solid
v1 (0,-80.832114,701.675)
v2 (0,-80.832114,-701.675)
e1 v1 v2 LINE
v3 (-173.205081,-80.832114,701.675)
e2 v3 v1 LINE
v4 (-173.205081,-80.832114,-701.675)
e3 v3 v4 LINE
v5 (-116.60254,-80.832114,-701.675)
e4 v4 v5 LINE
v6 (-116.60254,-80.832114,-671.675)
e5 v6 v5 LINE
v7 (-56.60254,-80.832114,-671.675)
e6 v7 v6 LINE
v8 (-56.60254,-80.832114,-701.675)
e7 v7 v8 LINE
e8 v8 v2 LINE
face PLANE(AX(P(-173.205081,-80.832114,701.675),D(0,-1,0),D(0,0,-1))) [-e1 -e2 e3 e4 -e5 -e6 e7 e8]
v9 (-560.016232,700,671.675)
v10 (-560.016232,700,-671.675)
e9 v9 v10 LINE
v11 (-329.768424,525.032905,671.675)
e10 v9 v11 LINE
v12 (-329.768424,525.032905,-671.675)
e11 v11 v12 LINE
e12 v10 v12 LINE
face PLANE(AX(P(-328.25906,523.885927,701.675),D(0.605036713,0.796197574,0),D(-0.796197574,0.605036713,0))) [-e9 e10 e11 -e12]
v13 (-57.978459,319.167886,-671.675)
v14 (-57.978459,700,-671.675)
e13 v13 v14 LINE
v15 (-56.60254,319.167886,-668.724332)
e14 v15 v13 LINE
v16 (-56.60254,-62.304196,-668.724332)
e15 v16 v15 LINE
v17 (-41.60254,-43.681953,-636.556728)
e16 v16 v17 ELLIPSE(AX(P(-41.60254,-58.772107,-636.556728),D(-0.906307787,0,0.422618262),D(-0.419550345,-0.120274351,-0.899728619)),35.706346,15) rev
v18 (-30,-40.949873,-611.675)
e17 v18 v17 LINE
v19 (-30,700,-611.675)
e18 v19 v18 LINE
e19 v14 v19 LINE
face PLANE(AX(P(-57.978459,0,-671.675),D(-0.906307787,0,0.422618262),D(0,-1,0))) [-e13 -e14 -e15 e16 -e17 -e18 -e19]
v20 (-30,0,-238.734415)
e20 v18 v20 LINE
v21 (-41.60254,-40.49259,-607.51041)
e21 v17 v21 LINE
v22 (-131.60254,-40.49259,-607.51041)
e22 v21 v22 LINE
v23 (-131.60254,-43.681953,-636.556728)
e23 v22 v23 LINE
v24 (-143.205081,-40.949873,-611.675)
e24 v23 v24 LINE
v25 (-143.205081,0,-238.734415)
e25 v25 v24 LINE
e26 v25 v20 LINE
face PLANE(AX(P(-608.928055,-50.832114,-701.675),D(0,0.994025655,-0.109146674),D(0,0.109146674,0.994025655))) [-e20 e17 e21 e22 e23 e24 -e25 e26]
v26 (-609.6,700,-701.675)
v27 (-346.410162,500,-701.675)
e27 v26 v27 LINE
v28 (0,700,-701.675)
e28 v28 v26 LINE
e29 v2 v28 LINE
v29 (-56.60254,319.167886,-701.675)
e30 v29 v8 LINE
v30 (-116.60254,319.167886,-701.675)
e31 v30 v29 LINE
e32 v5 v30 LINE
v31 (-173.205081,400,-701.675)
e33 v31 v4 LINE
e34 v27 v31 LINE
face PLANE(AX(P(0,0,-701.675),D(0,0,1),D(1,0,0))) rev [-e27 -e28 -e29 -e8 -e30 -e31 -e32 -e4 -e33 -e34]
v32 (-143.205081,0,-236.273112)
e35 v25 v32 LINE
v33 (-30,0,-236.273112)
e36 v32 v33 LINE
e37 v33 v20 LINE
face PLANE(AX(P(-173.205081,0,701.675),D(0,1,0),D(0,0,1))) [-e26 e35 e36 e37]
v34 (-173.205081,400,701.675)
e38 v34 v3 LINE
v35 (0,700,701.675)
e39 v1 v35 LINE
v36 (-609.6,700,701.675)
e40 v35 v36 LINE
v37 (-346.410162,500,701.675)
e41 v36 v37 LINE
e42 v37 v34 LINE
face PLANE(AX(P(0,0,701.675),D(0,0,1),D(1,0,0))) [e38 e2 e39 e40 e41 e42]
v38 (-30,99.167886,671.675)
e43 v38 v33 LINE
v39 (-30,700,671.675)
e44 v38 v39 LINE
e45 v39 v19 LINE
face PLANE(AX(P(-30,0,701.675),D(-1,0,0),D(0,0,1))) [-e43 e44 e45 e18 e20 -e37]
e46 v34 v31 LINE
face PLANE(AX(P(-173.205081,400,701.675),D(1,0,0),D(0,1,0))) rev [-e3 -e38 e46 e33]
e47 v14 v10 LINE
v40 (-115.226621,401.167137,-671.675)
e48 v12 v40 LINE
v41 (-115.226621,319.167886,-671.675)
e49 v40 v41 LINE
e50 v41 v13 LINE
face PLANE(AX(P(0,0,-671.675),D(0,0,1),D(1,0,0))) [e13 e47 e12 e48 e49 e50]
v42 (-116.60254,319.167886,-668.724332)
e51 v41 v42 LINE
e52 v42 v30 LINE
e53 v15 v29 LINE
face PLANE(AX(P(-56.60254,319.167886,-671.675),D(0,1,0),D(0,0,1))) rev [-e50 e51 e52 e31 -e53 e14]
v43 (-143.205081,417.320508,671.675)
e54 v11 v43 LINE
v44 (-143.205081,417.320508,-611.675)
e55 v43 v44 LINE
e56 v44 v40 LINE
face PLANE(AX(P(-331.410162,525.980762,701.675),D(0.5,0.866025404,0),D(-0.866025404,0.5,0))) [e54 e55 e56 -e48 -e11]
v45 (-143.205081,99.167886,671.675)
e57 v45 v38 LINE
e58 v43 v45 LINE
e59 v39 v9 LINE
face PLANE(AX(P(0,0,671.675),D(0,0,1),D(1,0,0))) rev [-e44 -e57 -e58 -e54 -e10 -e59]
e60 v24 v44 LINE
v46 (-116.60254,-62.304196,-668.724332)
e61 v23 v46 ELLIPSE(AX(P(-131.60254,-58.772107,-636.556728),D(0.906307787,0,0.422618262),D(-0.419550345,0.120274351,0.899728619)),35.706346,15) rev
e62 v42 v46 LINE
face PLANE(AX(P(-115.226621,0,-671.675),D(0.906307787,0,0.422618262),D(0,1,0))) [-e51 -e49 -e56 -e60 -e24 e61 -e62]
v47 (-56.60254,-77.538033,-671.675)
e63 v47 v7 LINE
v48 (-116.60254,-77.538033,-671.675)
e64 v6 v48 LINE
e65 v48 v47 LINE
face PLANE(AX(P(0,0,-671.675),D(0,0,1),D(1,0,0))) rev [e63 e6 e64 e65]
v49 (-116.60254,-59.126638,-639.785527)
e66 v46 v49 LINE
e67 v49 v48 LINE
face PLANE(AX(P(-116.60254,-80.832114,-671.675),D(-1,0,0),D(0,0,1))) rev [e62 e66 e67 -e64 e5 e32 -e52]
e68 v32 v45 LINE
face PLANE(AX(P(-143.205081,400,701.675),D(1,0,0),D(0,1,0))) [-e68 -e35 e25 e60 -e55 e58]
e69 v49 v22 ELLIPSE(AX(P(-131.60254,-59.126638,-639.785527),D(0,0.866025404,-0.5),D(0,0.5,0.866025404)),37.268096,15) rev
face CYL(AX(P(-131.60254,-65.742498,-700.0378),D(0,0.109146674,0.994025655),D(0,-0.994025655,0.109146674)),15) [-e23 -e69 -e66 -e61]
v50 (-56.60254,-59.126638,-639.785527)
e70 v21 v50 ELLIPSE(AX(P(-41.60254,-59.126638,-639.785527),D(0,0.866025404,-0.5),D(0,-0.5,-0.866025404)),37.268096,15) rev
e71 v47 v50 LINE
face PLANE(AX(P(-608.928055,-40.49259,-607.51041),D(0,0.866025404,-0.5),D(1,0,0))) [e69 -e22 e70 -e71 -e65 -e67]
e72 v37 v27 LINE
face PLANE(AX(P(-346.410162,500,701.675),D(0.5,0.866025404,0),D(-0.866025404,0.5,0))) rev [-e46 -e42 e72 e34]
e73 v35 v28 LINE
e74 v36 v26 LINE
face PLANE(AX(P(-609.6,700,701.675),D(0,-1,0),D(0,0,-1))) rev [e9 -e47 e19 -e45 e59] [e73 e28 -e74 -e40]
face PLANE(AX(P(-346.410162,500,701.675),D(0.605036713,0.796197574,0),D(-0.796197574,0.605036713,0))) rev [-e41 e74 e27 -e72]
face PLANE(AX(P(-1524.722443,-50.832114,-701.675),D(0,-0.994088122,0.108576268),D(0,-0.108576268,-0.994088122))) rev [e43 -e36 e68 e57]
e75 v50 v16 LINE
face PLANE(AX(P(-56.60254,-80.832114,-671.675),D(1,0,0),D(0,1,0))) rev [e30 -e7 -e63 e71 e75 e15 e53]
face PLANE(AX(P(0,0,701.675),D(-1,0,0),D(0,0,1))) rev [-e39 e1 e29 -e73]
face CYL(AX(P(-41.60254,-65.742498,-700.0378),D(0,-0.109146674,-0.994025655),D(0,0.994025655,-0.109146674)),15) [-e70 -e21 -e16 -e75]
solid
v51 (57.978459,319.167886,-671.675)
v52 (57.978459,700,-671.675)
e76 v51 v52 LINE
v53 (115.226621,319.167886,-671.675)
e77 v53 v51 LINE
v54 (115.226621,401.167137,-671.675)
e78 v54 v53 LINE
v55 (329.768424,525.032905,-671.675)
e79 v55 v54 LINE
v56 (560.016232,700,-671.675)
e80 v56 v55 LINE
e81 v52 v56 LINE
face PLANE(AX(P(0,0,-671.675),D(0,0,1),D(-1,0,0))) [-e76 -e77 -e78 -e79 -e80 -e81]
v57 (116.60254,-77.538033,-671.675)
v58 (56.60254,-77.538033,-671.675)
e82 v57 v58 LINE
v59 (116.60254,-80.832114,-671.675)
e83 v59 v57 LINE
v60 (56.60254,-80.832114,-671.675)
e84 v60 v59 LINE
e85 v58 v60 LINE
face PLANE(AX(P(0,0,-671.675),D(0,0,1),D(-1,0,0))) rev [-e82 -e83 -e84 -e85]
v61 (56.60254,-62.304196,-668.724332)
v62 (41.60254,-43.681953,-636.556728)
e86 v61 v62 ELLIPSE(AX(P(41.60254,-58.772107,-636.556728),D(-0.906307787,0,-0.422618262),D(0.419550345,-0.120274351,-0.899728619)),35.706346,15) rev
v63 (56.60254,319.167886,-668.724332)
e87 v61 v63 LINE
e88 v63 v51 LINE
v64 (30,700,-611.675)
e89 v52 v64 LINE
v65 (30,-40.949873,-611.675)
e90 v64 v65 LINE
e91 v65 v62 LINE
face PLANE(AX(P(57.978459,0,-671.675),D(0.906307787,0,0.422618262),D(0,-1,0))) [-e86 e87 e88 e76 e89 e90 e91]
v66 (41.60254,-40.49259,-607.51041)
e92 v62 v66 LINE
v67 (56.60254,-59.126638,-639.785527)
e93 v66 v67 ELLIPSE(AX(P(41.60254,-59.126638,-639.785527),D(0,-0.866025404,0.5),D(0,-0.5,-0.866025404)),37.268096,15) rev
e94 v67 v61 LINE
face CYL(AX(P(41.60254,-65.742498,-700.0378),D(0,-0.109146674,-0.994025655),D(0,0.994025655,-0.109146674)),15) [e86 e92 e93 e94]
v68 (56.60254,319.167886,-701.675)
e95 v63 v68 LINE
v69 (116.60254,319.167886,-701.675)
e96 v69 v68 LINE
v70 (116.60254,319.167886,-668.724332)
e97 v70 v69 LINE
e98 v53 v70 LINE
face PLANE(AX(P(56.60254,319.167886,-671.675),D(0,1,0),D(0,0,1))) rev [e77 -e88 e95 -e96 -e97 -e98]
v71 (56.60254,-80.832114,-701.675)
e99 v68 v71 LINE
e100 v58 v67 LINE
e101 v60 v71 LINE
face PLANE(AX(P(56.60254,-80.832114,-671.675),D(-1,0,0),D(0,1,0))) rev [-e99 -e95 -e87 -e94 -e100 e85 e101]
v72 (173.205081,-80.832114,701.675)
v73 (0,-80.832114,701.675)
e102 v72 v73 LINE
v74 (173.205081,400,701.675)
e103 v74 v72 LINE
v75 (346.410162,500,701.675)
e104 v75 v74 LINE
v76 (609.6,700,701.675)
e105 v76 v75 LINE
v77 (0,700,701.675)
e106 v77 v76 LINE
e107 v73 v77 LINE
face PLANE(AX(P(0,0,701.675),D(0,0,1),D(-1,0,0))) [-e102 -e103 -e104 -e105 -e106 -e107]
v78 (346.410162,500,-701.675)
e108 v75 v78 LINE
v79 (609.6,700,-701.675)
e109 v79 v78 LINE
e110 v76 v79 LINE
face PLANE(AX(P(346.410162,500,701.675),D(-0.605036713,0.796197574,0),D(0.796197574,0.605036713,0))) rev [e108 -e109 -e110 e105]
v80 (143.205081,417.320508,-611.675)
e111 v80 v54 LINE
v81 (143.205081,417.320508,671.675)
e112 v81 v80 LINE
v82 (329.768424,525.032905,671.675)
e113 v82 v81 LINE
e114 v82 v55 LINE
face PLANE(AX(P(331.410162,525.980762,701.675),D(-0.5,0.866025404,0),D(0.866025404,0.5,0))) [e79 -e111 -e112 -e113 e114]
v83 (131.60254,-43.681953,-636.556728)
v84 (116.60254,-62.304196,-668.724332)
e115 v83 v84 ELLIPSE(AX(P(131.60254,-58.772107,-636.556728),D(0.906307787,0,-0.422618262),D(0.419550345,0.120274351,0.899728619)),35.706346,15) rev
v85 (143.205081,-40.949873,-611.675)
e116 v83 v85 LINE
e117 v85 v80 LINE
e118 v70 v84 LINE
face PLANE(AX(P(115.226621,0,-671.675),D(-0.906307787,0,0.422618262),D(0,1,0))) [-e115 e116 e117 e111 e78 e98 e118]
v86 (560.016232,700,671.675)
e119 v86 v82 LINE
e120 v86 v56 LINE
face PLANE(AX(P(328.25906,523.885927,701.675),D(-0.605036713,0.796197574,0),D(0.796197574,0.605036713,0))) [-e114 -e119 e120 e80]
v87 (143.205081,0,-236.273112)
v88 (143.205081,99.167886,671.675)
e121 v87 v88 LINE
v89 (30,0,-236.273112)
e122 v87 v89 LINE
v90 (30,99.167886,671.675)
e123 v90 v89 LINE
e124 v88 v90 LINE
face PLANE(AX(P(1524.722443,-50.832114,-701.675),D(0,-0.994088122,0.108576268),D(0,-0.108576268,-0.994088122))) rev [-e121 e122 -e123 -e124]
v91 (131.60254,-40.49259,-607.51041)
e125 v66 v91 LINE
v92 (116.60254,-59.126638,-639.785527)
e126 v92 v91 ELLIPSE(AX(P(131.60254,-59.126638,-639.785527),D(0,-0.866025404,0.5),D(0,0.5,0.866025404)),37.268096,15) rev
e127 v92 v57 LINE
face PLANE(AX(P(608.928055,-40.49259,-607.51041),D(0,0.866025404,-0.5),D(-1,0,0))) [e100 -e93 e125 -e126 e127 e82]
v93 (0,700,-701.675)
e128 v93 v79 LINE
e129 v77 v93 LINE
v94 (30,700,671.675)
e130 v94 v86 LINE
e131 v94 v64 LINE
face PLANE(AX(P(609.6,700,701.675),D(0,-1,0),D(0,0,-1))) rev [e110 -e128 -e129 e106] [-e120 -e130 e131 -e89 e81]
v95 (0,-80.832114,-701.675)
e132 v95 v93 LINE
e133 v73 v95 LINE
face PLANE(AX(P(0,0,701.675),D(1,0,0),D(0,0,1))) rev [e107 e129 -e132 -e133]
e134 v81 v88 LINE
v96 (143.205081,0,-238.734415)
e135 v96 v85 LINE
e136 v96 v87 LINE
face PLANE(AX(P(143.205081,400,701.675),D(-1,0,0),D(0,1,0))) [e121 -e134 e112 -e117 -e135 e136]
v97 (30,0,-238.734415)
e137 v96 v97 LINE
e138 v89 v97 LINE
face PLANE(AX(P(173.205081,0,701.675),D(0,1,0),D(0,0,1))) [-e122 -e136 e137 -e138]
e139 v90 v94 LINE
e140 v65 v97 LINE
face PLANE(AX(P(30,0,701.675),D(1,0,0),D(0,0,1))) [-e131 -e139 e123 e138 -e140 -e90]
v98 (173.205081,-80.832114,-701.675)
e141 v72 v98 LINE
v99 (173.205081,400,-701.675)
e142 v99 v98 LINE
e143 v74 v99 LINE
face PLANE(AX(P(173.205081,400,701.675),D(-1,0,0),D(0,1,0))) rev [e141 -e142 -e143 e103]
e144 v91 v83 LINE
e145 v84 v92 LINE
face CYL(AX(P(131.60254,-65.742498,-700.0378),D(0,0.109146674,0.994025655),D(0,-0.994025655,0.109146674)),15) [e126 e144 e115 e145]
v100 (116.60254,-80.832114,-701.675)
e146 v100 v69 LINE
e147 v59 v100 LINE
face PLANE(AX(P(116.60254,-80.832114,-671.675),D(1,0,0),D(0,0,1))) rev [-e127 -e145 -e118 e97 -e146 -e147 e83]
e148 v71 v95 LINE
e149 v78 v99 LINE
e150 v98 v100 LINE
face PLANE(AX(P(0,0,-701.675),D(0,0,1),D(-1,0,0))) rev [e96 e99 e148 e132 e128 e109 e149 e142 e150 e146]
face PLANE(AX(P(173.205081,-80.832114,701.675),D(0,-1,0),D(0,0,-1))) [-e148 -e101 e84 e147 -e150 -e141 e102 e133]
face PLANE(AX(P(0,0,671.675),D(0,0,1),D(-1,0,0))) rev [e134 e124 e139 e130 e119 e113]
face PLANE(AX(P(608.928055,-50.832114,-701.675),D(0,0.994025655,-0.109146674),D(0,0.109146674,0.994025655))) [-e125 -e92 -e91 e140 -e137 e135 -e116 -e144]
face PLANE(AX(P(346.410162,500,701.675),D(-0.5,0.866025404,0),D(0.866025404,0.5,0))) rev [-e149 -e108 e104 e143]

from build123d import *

# Parameters (mm, degrees)
BOSS_EXTRUDE1_DEPTH = 701.675
SHELL1_T            = -30
SKETCH3_W           = 113.205080757
SKETCH3_H           = 1343.35
CUT_EXTRUDE1_DEPTH  = 1146.801014847
SKETCH4_W           = 1403.35
SKETCH4_H           = 80.832113544
BOSS_EXTRUDE2_DEPTH = 173.20508
BOSS_EXTRUDE3_REACH = 1150.165
SKETCH10_W          = 60
SKETCH10_H          = 400
CUT_EXTRUDE5_DEPTH  = 30
CUT_EXTRUDE6_DEPTH  = 113.205081
SKETCH12_W          = 26.602540378
SKETCH12_H          = 50.832113544
SKETCH12_W_2        = 26.602540379
BOSS_EXTRUDE4_DEPTH = 30
CHAMFER3_SIZE       = 30
CHAMFER3_SIZE2      = 64.550235712
CHAMFER4_SIZE       = 27.978459489
CHAMFER4_SIZE_2     = 60
FILLET2_R           = 15


with BuildPart() as part:
    # Sketch2 → Boss-Extrude1 (new, symmetric)
    with BuildSketch(Plane.XY):
        Polygon((0, 0), (0, 700), (-609.6, 700), (-346.410161514, 500), (-173.205080757, 400), (-173.205080757, 0), align=None)
    extrude(amount=BOSS_EXTRUDE1_DEPTH, both=True)

    # Shell1
    shell1_openings = [part.faces().sort_by_distance(p)[0] for p in [
        (-304.8, 700, 0),
    ]]
    offset(amount=SHELL1_T, openings=shell1_openings, kind=Kind.INTERSECTION)

    # Sketch3 → Cut-Extrude1 (cut, through all)
    with BuildSketch(Plane(origin=(0, 30, 0), x_dir=(1, 0, 0), z_dir=(0, 1, 0))):
        with Locations((-86.602540379, 0)):
            Rectangle(SKETCH3_W, SKETCH3_H)
    extrude(amount=-CUT_EXTRUDE1_DEPTH, mode=Mode.SUBTRACT)

    # Sketch4 → Boss-Extrude2 (add)
    with BuildSketch(Plane(origin=(0, 0, 0), x_dir=(0, 0, -1), z_dir=(1, 0, 0))):
        with Locations((0, -40.416056772)):
            Rectangle(SKETCH4_W, SKETCH4_H)
    extrude(amount=-BOSS_EXTRUDE2_DEPTH)

    # Sketch8 → Boss-Extrude3 (add, up to next)
    with BuildSketch(Plane.ZY.offset(30), mode=Mode.PRIVATE) as boss_extrude3_sk1:
        Polygon((671.675, -50.832113544), (-701.675, -50.832113544), (671.675, 99.167886456), align=None)
    boss_extrude3_tool1 = extrude(boss_extrude3_sk1.sketch, amount=BOSS_EXTRUDE3_REACH, mode=Mode.PRIVATE) - part.part
    add(boss_extrude3_tool1.solids().sort_by_distance((-30, -0.832114, 213.891667))[0])

    # Sketch10 → Cut-Extrude5 (cut)
    with BuildSketch(Plane(origin=(0, 0, -701.675), x_dir=(-1, 0, 0), z_dir=(0, 0, -1))):
        with Locations((86.602540378, 119.167886456)):
            Rectangle(SKETCH10_W, SKETCH10_H)
    extrude(amount=-CUT_EXTRUDE5_DEPTH, mode=Mode.SUBTRACT)

    # Sketch11 → Cut-Extrude6 (cut)
    with BuildSketch(Plane.ZY.offset(30)):
        Polygon((-238.734415101, 0), (-701.675, 0), (-701.675, -50.832113544), align=None)
    extrude(amount=CUT_EXTRUDE6_DEPTH, mode=Mode.SUBTRACT)

    # Sketch12 → Boss-Extrude4 (add)
    with BuildSketch(Plane(origin=(0, 0, -701.675), x_dir=(-1, 0, 0), z_dir=(0, 0, -1))):
        with Locations((43.301270189, -25.416056772)):
            Rectangle(SKETCH12_W, SKETCH12_H)
        with Locations((129.903810568, -25.416056772)):
            Rectangle(SKETCH12_W_2, SKETCH12_H)
    extrude(amount=-BOSS_EXTRUDE4_DEPTH)

    # Chamfer3
    chamfer3_edges = [part.edges().sort_by_distance(p)[0] for p in [
        (-86.602540378, -47.538033361, -671.675),
    ]]
    chamfer3_side = [part.faces().sort_by_distance(p)[0] for p in [
        (-86.602540378, -64.185073453, -671.675),
    ]]
    chamfer(chamfer3_edges, length=CHAMFER3_SIZE, length2=CHAMFER3_SIZE2, reference=chamfer3_side[0])

    # Chamfer4
    # the kernel refuses this chamfer: 60, 27.978459489 mm, written as the material it adds along each edge
    with BuildSketch(Plane(origin=(-30, -202.996561647, -671.675), x_dir=(-0.9971975577536775, 0, -0.07481330637059934), z_dir=(0, 1, 0))) as chamfer4_piece_1_section:
        Polygon((CHAMFER4_SIZE * 0.997197557764, CHAMFER4_SIZE * 0.0748133063714), (-CHAMFER4_SIZE_2 * 0.0748133063706, CHAMFER4_SIZE_2 * 0.997197557754), (0, 0), align=None)
    chamfer4_piece_1 = extrude(amount=902.996561647, mode=Mode.PRIVATE)
    chamfer4_piece_1 = split(chamfer4_piece_1, bisect_by=Plane(origin=(-56.602540378, 136.912183194, -651.689026628), z_dir=(1, 0, 0)), keep=Keep.TOP, mode=Mode.PRIVATE)
    chamfer4_piece_1 = split(chamfer4_piece_1, bisect_by=Plane(origin=(-39.296991829, -43.172308533, -631.915268116), z_dir=(0, 0.9940256554090712, -0.1091466737402779)), keep=Keep.TOP, mode=Mode.PRIVATE)
    add(chamfer4_piece_1)
    with BuildSketch(Plane(origin=(-30, -202.996561647, -671.675), x_dir=(-0.9971975577536775, 0, -0.07481330637059934), z_dir=(0, 1, 0))) as chamfer4_piece_2_section:
        Polygon((CHAMFER4_SIZE * 0.997197557764, CHAMFER4_SIZE * 0.0748133063714), (-CHAMFER4_SIZE_2 * 0.0748133063706, CHAMFER4_SIZE_2 * 0.997197557754), (0, 0), align=None)
    chamfer4_piece_2 = extrude(amount=902.996561647, mode=Mode.PRIVATE)
    chamfer4_piece_2 = split(chamfer4_piece_2, bisect_by=Plane(origin=(-57.061180082, 319.167886456, -670.691443982), z_dir=(0, 1, 0)), keep=Keep.TOP, mode=Mode.PRIVATE)
    add(chamfer4_piece_2)
    with BuildSketch(Plane(origin=(-143.205080757, 572.779036361, -671.675), x_dir=(0.9971975577536775, 0, -0.07481330637059934), z_dir=(0, -1, 0))) as chamfer4_piece_3_section:
        Polygon((CHAMFER4_SIZE * 0.997197557764, CHAMFER4_SIZE * 0.0748133063714), (-CHAMFER4_SIZE_2 * 0.0748133063706, CHAMFER4_SIZE_2 * 0.997197557754), (0, 0), align=None)
    chamfer4_piece_3 = extrude(amount=572.779036361, mode=Mode.PRIVATE)
    chamfer4_piece_3 = split(chamfer4_piece_3, bisect_by=Plane(origin=(-116.144636453, 319.167886456, -670.690655041), z_dir=(0, 1, 0)), keep=Keep.TOP, mode=Mode.PRIVATE)
    chamfer4_piece_3 = split(chamfer4_piece_3, bisect_by=Plane(origin=(-98.276526048, 391.38099492, -670.690655041), z_dir=(-0.4999999999999916, -0.8660254037844436, 0)), keep=Keep.TOP, mode=Mode.PRIVATE)
    add(chamfer4_piece_3)
    with BuildSketch(Plane(origin=(-143.205080757, 572.779036361, -671.675), x_dir=(0.9971975577536775, 0, -0.07481330637059934), z_dir=(0, -1, 0))) as chamfer4_piece_4_section:
        Polygon((CHAMFER4_SIZE * 0.997197557764, CHAMFER4_SIZE * 0.0748133063714), (-CHAMFER4_SIZE_2 * 0.0748133063706, CHAMFER4_SIZE_2 * 0.997197557754), (0, 0), align=None)
    chamfer4_piece_4 = extrude(amount=572.779036361, mode=Mode.PRIVATE)
    chamfer4_piece_4 = split(chamfer4_piece_4, bisect_by=Plane(origin=(-116.602540378, 159.583943228, -651.628898069), z_dir=(-1, 0, 0)), keep=Keep.TOP, mode=Mode.PRIVATE)
    chamfer4_piece_4 = split(chamfer4_piece_4, bisect_by=Plane(origin=(-24.639506088, 348.866641624, -651.628898069), z_dir=(-0.4999999999999916, -0.8660254037844436, 0)), keep=Keep.TOP, mode=Mode.PRIVATE)
    add(chamfer4_piece_4)
    with BuildSketch(Plane(origin=(-143.205080757, 0, -671.675), x_dir=(0.997197557763733, 0, -0.07481330623656689), z_dir=(0, -1, 0))) as chamfer4_piece_5_section:
        Polygon((CHAMFER4_SIZE * 0.997197557774, CHAMFER4_SIZE * 0.0748133062374), (-CHAMFER4_SIZE_2 * 0.0748133102771, CHAMFER4_SIZE_2 * 0.997197557461), (0, 0), align=None)
    chamfer4_piece_5 = extrude(amount=202.996561649, mode=Mode.PRIVATE)
    chamfer4_piece_5 = split(chamfer4_piece_5, bisect_by=Plane(origin=(-133.810698644, -45.119634059, -649.650041571), z_dir=(0, 0.9940256554090712, -0.1091466737402779)), keep=Keep.TOP, mode=Mode.PRIVATE)
    chamfer4_piece_5 = split(chamfer4_piece_5, bisect_by=Plane(origin=(-116.602540378, -22.694999754, -652.112326353), z_dir=(-1, 0, 0)), keep=Keep.TOP, mode=Mode.PRIVATE)
    add(chamfer4_piece_5)

    # Fillet2
    # the kernel refuses this fillet: 15 mm, written as the material it takes off along each edge
    with BuildSketch(Plane(origin=(-116.602540378, -51.307042391, -706.000294048), x_dir=(-1, 0, 0), z_dir=(0, 0.1091466737402779, 0.9940256554090712))) as fillet2_piece_1_section:
        with BuildLine():
            CenterArc((FILLET2_R, FILLET2_R), FILLET2_R, 180, 90)
            Line((0, FILLET2_R), (0, 0))
            Line((0, 0), (FILLET2_R, 0))
        make_face()
    fillet2_piece_1 = extrude(amount=136.581833424, mode=Mode.PRIVATE)
    fillet2_piece_1 = split(fillet2_piece_1, bisect_by=Plane(origin=(-128.893894845, -47.070973497, -642.365437483), z_dir=(0.9063077856304061, 0, 0.4226182647563991)), keep=Keep.TOP, mode=Mode.PRIVATE)
    fillet2_piece_1 = split(fillet2_piece_1, bisect_by=Plane(origin=(-119.802580373, -55.394163315, -633.320692004), z_dir=(0, 0.8660254037844397, -0.4999999999999981)), keep=Keep.TOP, mode=Mode.PRIVATE)
    add(fillet2_piece_1, mode=Mode.SUBTRACT)
    with BuildSketch(Plane(origin=(-56.602540378, -51.307042388, -706.000294023), x_dir=(1, 0, 0), z_dir=(0, 0.1091466737402779, 0.9940256554090712))) as fillet2_piece_2_section:
        with BuildLine():
            CenterArc((FILLET2_R, -FILLET2_R), FILLET2_R, 90, 90)
            Line((0, -FILLET2_R), (0, 0))
            Line((0, 0), (FILLET2_R, 0))
        make_face()
    fillet2_piece_2 = extrude(amount=136.581833399, mode=Mode.PRIVATE)
    fillet2_piece_2 = split(fillet2_piece_2, bisect_by=Plane(origin=(-44.311185982, -47.070973496, -642.36543738), z_dir=(-0.9063077870369262, 0, 0.42261826174010714)), keep=Keep.TOP, mode=Mode.PRIVATE)
    fillet2_piece_2 = split(fillet2_piece_2, bisect_by=Plane(origin=(-53.402500388, -55.394163299, -633.320691976), z_dir=(0, 0.8660254037844397, -0.4999999999999981)), keep=Keep.TOP, mode=Mode.PRIVATE)
    add(fillet2_piece_2, mode=Mode.SUBTRACT)


with BuildPart() as body_2:
    # Mirror2: mirrored copy
    add(part.part.mirror(Plane(origin=(0, 0, 701.675), x_dir=(0, 0, 1), z_dir=(-1, 0, 0))))


solid = Compound([part.part, body_2.part])
